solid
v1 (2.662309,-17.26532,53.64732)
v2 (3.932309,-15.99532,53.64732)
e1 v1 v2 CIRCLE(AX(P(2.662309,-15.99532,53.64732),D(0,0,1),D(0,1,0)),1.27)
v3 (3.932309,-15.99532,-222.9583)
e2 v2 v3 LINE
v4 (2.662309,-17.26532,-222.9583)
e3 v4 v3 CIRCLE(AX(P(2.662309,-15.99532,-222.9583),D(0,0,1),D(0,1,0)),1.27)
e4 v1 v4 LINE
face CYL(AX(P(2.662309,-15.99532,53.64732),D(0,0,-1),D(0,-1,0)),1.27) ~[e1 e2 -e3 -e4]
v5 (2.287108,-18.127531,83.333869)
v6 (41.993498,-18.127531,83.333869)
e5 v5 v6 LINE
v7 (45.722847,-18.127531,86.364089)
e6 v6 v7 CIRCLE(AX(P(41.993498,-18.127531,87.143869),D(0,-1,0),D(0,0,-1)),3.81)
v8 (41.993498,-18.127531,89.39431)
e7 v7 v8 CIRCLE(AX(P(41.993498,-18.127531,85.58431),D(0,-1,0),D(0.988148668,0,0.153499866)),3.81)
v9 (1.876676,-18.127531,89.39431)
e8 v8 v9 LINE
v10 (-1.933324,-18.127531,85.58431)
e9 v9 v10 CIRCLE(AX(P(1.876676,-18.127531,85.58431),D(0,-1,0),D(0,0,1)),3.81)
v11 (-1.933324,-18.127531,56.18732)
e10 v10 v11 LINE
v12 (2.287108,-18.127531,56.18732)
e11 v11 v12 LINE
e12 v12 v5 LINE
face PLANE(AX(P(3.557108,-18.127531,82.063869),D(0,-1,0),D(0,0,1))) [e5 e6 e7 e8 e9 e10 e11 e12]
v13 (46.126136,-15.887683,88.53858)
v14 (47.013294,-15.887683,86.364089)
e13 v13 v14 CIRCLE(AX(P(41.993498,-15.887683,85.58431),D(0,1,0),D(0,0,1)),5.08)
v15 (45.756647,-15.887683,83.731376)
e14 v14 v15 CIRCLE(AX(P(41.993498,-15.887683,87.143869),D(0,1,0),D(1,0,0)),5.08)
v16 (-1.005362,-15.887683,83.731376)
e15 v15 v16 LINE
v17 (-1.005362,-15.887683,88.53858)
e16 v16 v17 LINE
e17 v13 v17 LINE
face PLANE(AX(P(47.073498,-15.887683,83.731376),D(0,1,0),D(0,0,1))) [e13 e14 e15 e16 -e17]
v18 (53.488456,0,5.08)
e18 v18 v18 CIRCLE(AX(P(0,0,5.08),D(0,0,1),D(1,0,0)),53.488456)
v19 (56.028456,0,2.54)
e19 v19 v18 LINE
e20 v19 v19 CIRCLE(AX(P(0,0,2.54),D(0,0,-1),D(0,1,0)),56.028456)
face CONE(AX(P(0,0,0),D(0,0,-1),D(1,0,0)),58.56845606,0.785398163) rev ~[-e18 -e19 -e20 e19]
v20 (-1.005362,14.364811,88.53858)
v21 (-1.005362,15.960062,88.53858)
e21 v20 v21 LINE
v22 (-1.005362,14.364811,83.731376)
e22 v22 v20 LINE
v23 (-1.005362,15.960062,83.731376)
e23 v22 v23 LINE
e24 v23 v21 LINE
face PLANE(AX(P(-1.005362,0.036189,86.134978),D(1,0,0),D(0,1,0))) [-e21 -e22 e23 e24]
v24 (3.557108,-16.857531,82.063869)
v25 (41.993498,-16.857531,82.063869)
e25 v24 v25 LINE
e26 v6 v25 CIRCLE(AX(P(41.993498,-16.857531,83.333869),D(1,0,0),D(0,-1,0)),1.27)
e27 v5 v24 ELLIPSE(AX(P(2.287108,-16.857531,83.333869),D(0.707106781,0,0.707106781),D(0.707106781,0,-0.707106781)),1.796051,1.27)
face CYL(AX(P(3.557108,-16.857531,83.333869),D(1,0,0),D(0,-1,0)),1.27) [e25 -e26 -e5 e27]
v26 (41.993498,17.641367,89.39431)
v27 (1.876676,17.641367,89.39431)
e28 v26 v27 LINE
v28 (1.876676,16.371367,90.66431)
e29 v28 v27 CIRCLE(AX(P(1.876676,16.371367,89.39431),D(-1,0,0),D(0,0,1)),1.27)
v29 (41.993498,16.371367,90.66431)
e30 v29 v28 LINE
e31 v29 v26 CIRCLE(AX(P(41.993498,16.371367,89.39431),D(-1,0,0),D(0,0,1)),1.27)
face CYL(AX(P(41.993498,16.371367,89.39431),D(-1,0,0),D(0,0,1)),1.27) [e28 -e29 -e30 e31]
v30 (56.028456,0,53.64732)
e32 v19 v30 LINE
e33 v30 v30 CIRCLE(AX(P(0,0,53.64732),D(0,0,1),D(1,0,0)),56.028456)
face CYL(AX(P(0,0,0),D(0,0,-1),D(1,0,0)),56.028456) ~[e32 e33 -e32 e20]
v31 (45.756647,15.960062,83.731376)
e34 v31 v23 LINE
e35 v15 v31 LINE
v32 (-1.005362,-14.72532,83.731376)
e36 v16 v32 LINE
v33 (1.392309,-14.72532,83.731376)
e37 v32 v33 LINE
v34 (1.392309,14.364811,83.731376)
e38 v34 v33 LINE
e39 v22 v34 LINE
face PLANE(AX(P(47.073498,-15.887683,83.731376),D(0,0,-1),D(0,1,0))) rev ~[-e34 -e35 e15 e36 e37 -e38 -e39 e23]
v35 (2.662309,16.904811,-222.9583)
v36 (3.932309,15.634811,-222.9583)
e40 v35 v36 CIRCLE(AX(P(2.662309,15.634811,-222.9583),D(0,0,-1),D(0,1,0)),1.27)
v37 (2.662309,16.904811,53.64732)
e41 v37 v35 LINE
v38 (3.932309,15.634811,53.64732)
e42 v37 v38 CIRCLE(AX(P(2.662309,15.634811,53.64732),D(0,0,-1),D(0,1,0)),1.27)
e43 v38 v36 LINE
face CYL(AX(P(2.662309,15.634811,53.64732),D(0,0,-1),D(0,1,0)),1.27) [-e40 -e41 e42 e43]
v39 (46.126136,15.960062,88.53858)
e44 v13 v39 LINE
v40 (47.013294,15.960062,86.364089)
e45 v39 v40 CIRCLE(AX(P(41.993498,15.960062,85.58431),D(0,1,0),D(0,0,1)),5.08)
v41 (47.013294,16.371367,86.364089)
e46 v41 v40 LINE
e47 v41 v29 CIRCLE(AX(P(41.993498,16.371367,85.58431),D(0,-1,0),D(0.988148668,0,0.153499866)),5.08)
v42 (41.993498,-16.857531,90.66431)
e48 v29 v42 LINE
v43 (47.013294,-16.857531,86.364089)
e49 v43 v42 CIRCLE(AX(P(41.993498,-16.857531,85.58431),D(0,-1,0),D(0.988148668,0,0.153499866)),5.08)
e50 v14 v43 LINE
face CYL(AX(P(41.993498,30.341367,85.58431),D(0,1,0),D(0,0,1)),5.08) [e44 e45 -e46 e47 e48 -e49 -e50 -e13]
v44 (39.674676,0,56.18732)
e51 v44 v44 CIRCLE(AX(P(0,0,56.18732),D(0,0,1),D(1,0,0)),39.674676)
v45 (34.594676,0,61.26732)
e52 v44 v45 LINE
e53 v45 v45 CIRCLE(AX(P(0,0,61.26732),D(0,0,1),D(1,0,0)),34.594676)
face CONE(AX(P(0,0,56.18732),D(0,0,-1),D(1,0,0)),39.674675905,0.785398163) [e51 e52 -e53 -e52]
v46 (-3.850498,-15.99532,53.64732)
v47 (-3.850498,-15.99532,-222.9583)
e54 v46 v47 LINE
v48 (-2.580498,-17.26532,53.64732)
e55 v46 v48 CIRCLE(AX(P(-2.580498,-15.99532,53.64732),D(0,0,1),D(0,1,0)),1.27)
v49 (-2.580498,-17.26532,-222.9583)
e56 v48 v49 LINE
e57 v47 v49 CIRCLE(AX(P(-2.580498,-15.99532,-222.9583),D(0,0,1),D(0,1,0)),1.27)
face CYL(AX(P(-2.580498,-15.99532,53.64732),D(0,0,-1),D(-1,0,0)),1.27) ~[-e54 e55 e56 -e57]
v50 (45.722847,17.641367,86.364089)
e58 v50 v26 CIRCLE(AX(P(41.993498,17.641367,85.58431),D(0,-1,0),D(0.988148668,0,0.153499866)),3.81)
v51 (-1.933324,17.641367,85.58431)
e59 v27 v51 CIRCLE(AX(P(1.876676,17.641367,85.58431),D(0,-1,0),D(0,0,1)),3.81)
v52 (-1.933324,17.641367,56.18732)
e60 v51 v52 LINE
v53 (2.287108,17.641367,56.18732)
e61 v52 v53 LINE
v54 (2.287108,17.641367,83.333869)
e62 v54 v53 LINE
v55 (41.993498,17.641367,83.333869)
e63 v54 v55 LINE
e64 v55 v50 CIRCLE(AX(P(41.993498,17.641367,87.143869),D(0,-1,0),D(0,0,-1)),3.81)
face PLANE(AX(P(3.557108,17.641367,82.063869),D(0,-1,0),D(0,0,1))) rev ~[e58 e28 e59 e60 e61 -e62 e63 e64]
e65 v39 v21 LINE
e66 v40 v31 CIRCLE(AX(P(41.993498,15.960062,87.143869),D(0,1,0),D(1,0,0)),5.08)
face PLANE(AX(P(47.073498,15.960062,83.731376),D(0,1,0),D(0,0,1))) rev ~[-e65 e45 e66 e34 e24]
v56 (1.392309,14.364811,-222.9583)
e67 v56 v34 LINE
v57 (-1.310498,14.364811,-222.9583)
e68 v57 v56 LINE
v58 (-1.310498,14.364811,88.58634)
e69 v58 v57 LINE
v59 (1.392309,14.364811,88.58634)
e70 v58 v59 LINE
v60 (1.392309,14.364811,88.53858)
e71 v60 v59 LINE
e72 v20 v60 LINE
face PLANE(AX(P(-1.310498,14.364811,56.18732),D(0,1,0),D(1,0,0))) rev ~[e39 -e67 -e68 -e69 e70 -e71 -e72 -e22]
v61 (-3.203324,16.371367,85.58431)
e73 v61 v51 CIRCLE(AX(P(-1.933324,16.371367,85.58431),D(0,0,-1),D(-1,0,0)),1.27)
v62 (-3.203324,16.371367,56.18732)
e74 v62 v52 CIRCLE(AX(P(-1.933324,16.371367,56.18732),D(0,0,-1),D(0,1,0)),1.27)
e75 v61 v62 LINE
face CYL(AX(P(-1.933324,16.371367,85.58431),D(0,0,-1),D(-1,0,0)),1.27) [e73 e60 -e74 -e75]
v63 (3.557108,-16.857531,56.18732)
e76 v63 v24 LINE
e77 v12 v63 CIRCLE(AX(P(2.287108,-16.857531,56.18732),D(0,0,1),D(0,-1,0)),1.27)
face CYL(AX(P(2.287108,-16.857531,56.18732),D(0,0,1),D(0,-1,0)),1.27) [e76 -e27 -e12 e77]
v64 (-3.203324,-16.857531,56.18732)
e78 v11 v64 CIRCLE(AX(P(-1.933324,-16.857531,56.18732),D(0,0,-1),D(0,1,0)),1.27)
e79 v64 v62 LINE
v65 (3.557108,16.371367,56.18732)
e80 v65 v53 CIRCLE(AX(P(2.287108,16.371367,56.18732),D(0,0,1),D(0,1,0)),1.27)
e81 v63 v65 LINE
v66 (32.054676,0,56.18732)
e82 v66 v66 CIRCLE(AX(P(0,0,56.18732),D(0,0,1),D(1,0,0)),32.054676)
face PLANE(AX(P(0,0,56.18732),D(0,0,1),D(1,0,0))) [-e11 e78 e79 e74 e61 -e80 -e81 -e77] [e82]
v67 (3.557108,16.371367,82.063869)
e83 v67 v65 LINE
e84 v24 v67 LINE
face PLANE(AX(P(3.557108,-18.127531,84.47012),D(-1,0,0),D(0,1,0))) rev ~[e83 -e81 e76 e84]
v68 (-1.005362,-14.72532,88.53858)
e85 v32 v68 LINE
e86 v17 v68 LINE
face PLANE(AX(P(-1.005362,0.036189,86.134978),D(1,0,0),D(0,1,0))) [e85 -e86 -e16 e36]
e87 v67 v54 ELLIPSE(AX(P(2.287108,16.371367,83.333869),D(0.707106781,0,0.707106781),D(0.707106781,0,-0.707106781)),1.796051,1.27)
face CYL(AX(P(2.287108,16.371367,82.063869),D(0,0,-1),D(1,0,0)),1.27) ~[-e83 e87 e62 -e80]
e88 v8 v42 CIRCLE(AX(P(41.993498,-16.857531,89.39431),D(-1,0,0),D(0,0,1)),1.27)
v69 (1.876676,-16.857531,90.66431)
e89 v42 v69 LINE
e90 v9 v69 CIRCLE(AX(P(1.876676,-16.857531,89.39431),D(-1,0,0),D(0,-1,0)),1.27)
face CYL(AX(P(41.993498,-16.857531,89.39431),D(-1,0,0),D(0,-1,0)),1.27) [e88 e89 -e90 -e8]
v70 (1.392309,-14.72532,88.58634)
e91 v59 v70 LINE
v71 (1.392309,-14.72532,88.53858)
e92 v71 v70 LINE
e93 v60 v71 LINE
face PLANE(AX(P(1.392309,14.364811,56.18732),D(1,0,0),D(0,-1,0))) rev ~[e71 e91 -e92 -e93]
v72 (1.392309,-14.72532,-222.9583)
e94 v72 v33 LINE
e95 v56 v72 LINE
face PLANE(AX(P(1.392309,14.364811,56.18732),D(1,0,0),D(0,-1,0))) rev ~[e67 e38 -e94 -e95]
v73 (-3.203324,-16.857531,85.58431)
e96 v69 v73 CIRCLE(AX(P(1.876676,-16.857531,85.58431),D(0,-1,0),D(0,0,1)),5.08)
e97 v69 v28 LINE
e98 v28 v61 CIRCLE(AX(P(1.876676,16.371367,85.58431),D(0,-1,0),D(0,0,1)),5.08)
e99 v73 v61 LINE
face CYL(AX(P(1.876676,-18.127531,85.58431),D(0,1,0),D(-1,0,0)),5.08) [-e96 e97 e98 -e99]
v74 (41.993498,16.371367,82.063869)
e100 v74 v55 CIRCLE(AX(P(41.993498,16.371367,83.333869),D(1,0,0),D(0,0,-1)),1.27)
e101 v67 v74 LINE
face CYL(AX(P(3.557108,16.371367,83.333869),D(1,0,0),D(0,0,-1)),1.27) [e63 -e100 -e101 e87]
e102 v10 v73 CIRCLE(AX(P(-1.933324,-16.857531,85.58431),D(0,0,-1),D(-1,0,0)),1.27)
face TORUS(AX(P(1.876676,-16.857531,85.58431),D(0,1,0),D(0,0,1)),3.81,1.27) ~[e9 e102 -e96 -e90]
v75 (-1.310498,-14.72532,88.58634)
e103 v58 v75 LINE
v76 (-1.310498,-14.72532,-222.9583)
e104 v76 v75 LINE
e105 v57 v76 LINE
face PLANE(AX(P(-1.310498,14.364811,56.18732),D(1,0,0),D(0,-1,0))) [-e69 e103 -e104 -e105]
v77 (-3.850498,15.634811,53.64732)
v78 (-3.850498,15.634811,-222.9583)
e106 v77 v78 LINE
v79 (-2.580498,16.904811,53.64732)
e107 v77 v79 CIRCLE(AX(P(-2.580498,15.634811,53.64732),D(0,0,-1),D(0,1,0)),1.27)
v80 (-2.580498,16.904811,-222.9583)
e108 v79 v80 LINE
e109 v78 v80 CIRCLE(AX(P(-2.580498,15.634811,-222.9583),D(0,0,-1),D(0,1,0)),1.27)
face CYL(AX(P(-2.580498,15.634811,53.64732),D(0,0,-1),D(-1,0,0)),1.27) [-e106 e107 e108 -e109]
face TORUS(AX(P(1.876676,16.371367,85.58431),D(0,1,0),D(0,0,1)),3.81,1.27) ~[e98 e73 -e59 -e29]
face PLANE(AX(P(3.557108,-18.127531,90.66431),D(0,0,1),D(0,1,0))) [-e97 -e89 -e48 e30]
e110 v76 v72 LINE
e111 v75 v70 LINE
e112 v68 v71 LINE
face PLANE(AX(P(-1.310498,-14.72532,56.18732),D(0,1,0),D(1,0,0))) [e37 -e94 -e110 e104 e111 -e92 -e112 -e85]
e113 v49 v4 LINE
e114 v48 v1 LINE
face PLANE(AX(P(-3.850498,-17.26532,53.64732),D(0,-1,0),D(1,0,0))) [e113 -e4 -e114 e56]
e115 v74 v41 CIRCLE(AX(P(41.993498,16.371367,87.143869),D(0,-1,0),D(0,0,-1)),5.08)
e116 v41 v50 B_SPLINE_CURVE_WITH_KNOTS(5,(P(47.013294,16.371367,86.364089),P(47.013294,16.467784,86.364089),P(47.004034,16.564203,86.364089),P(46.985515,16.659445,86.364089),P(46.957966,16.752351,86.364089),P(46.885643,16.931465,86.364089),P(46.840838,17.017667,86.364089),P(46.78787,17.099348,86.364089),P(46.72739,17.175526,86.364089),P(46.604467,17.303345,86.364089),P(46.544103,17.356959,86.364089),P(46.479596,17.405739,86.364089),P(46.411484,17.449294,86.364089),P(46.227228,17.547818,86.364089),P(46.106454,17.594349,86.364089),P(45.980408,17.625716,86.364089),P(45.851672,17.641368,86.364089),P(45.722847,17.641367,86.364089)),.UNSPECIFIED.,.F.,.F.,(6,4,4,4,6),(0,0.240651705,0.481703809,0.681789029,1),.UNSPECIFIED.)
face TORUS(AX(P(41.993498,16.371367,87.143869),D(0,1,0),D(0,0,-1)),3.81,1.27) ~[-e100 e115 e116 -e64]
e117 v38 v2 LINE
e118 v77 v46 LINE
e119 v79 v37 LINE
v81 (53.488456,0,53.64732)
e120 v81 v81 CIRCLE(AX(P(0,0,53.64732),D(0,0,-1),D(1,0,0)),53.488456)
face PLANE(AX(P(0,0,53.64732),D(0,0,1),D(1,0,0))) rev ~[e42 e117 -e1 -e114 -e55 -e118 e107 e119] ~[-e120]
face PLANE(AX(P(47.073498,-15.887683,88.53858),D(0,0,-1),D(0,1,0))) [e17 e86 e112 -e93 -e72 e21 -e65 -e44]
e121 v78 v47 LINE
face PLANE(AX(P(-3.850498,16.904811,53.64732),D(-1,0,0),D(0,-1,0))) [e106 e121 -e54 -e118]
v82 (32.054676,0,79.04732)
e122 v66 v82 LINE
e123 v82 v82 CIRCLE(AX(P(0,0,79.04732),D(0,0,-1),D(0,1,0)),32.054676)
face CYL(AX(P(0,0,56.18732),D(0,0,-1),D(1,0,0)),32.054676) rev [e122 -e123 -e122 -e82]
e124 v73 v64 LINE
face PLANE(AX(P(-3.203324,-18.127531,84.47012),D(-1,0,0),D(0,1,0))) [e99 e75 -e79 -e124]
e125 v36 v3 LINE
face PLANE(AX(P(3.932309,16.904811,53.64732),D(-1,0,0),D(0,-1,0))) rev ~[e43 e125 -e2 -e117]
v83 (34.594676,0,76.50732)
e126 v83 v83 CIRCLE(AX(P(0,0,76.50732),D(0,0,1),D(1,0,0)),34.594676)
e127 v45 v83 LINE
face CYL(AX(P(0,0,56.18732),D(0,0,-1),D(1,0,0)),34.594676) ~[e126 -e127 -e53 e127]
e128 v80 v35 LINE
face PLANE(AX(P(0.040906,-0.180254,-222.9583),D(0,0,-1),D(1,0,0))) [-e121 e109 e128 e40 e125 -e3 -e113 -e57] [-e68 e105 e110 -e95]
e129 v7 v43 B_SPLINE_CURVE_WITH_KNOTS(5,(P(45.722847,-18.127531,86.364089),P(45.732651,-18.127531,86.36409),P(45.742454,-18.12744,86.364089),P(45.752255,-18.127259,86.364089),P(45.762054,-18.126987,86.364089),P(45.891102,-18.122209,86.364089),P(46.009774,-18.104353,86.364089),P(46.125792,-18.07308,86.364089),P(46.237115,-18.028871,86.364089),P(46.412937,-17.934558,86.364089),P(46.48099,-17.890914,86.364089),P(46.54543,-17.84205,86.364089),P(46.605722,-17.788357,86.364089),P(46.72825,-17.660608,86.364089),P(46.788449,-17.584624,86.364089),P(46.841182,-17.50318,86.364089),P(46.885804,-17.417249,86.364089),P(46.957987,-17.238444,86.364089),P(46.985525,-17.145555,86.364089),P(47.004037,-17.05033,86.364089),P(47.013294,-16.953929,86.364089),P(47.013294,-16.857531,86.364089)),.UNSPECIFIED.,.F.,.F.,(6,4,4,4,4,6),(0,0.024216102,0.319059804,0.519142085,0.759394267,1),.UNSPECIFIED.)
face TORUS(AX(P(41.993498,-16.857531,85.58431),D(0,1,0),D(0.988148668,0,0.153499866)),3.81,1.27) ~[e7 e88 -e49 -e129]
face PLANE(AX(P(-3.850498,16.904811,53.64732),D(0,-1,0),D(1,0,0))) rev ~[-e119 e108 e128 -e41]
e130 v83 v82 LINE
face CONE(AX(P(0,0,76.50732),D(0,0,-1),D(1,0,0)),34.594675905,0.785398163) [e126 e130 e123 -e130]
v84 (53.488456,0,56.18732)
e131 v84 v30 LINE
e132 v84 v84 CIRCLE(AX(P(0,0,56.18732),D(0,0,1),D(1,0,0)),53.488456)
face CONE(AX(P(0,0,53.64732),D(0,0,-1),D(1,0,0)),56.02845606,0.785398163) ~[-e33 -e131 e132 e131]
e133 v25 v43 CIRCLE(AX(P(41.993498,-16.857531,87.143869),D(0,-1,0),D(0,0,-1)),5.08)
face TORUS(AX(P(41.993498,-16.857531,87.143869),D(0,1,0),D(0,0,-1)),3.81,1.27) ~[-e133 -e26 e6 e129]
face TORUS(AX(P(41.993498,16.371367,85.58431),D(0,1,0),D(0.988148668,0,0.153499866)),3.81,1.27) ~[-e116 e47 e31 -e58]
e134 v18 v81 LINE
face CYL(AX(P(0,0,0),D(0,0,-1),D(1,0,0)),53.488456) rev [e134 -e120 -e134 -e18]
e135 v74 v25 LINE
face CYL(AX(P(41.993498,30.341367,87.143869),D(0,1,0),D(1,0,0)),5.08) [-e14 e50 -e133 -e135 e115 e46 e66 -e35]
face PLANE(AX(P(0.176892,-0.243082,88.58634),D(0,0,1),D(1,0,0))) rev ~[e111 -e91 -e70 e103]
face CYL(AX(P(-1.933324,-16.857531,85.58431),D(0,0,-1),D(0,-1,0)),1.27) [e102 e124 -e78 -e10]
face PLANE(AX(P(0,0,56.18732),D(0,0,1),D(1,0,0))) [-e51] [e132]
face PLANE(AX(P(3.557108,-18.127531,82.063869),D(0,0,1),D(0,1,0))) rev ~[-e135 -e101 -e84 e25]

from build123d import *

# Parameters (mm, degrees)
F0_R         = 56.0284560605
F1_DEPTH     = 56.18732
F2_T         = -2.54
F3_W         = 7.7828075737
F3_H         = 34.1701302677
F4_DEPTH     = 276.60562
F6_R         = 34.5946759053
F7_DEPTH     = 25.4
F8_T         = 2.54
F8_T3_DEPTH  = 39.2501302677
F8_T5_DEPTH  = 12.8628075737
F10_SIZE     = 2.54
F11_W        = 6.7604319192
F11_H        = 35.768898204
F12_DEPTH    = 28.2828
F13_W        = 6.7604319192
F13_H        = 35.768898204
F14_DEPTH    = 6.19419
F15_W        = 35.768898204
F15_H        = 8.6004413581
F16_DEPTH    = 43.51639
F17_W        = 31.8477451801
F17_H        = 4.8072040081
F18_DEPTH    = 48.07886
F19_DEPTH    = 32.39902
F20_R        = 5.08
F21_T1_DEPTH = 61.168898204
F22_R        = 1.27


# Not quite as in the source:
# - a fillet or chamfer that OpenCascade refuses, or shapes differently, is made with other operations: its cross-section is extruded or revolved along the edge and cut away or added
# - a shell that OpenCascade refuses in one call is made with other operations: the cavity is built on its own and cut out


with BuildPart() as f1:
    # F0 (on Top) → F1 (new body)
    with BuildSketch(Plane.XY):
        Circle(F0_R)
    extrude(amount=F1_DEPTH)

    # F2
    f2_openings = [f1.faces().sort_by_distance(p)[0] for p in [
        (0, 0, 0),
    ]]
    offset(amount=F2_T, openings=f2_openings)

    # F3 (on face) → F4 (join)
    with BuildSketch(Plane(origin=(0, 0, 53.64732), x_dir=(1, 0, 0), z_dir=(0, 0, -1))):
        with Locations((0.0409056073, 0.1802544365)):
            Rectangle(F3_W, F3_H)
    extrude(amount=F4_DEPTH)

    # F5: chamfer of 5.08 on 1 edges, made by hand

    # F5_s1 → F5_t2 (revolve, cut)
    with BuildSketch(Plane.XZ):
        Polygon((58.5684560605, 0), (53.4884560605, 5.08), (53.4884560605, 0), align=None)
    revolve(axis=Axis((0, 0, 0), (0, 0, 1)), mode=Mode.SUBTRACT)

    # F6 (on face) → F7 (join)
    with BuildSketch(Plane.XY.offset(56.18732)):
        Circle(F6_R)
    extrude(amount=F7_DEPTH)

    # F8: shell of thickness 2.54, made by hand


with BuildPart() as f8_core1:
    # F8_t2: copy of F1
    add(f1.part)

    # the walls: a layer under each face that stays
    f8_faces = [f8_core1.faces().sort_by_distance(p)[0] for p in [
        (-56.0284560605, 0, 29.36366),
        (-54.7584560605, 0, 3.81),
        (-37.3523040403, -37.3523040403, 56.18732),
        (-53.4884560605, 0, 29.36366),
        (-34.5946759053, 0, 68.88732),
        (-35.658970707, -35.658970707, 53.64732),
        (3.9323093942, -0.1802544365, -84.65549),
        (0.0409056073, 16.9048106974, -84.65549),
        (-3.8504981795, -0.1802544365, -84.65549),
        (0.0409056073, -17.2653195703, -84.65549),
    ]]
    thicken(f8_faces, amount=-F8_T, mode=Mode.SUBTRACT)

    # F8_s4 → F8_t3 (cut)
    with BuildSketch(Plane.XZ.offset(-19.4448106974)):
        Polygon((3.9577093942, 53.62192), (3.9323093942, 56.18732), (1.3923093942, 56.18732), (1.3923093942, 53.64732), align=None)
        Polygon((-3.8758981795, 53.62192), (-3.8504981795, 56.18732), (-1.3104981795, 56.18732), (-1.3104981795, 53.64732), align=None)
    extrude(amount=F8_T3_DEPTH, mode=Mode.SUBTRACT)

    # F8_s6 → F8_t5 (cut)
    with BuildSketch(Plane.YZ.offset(-6.3904981795)):
        Polygon((16.9302106974, 53.62192), (16.9048106974, 56.18732), (14.3648106974, 56.18732), (14.3648106974, 53.64732), align=None)
        Polygon((-17.2907195703, 53.62192), (-17.2653195703, 56.18732), (-14.7253195703, 56.18732), (-14.7253195703, 53.64732), align=None)
    extrude(amount=F8_T5_DEPTH, mode=Mode.SUBTRACT)

    # F8_s7 → F8_t8 (revolve, cut)
    with BuildSketch(Plane.XZ):
        Polygon((34.6200759053, 56.21272), (34.5946759053, 53.64732), (32.0546759053, 53.64732), (32.0546759053, 56.18732), align=None)
    revolve(axis=Axis((0, 0, 56.18732), (0, 0, 1)), mode=Mode.SUBTRACT)

    # F8_s9 → F8_t10 (revolve, cut)
    with BuildSketch(Plane.XZ):
        Polygon((53.4630560605, 53.62192), (56.0284560605, 53.64732), (56.0284560605, 56.18732), (53.4884560605, 56.18732), align=None)
    revolve(axis=Axis((0, 0, 53.64732), (0, 0, -1)), mode=Mode.SUBTRACT)


with BuildPart() as f1_1:
    add(f1.part)

    # what is left inside the walls is the cavity
    f8_cavity = [f8_core1.part.solids().sort_by_distance(p)[0] for p in [
        (1.366909, -5.028609, -83.38549),
    ]]
    add(f8_cavity, mode=Mode.SUBTRACT)

    # F9: chamfer of 5.08 on 2 edges, made by hand

    # F9_s1 → F9_t2 (revolve)
    with BuildSketch(Plane.XZ):
        Polygon((39.6746759053, 56.18732), (34.5946759053, 61.26732), (34.5946759053, 56.18732), align=None)
    revolve(axis=Axis((0, 0, 56.18732), (0, 0, 1)))

    # F9_s3 → F9_t4 (revolve, cut)
    with BuildSketch(Plane.XZ):
        Polygon((34.5946759053, 76.50732), (29.5146759053, 81.58732), (34.5946759053, 81.58732), align=None)
    revolve(axis=Axis((0, 0, 81.58732), (0, 0, 1)), mode=Mode.SUBTRACT)

    # F10
    f10_edges = [f1_1.edges().sort_by_distance(p)[0] for p in [
        (-56.028456, 0, 56.18732),
    ]]
    chamfer(f10_edges, length=F10_SIZE)

    # F11 (on face) → F12 (join)
    with BuildSketch(Plane.XY.offset(56.18732)):
        with Locations((0.176892383, -0.2430817112)):
            Rectangle(F11_W, F11_H)
    extrude(amount=F12_DEPTH)

    # F13 (on face) → F14 (join)
    with BuildSketch(Plane.XY.offset(84.47012)):
        with Locations((0.176892383, -0.2430817112)):
            Rectangle(F13_W, F13_H)
    extrude(amount=F14_DEPTH)

    # F15 (on face) → F16 (join)
    with BuildSketch(Plane.YZ.offset(3.5571083426)):
        with Locations((-0.2430817112, 86.3640893209)):
            Rectangle(F15_W, F15_H)
    extrude(amount=F16_DEPTH)

    # F17 (on face) → F18 (cut)
    with BuildSketch(Plane.YZ.offset(47.0734983426)):
        with Locations((0.0361893326, 86.1349776387)):
            Rectangle(F17_W, F17_H)
    extrude(amount=-F18_DEPTH, mode=Mode.SUBTRACT)

    # F19 (cut): a face of the model
    f19_faces = [f1_1.faces().sort_by_distance(p)[0] for p in [
        (0.0409056074, -0.1802544364, 56.18732),
    ]]
    extrude(f19_faces, amount=-F19_DEPTH, mode=Mode.SUBTRACT)

    # F20
    f20_edges = [f1_1.edges().sort_by_distance(p)[0] for p in [
        (-3.203324, -0.243082, 90.66431),
    ]]
    fillet(f20_edges, radius=F20_R)

    # F21: fillet of radius 5.08 on 2 edges, made by hand

    # F21_s2 → F21_t1 (cut)
    with BuildSketch(Plane.XZ.offset(-30.3413673908)):
        with BuildLine():
            ThreePointArc((41.9934983426, 90.66431), (45.5856007911, 89.1764124484), (47.0734983426, 85.58431))
            Line((47.0734983426, 85.58431), (47.0734983426, 90.66431))
            Line((47.0734983426, 90.66431), (41.9934983426, 90.66431))
        make_face()
        with BuildLine():
            ThreePointArc((47.0734983426, 87.1438686419), (45.5856007911, 83.5517661934), (41.9934983426, 82.0638686419))
            Line((41.9934983426, 82.0638686419), (47.0734983426, 82.0638686419))
            Line((47.0734983426, 82.0638686419), (47.0734983426, 87.1438686419))
        make_face()
    extrude(amount=F21_T1_DEPTH, mode=Mode.SUBTRACT)

    # F22
    f22_edges = [f1_1.edges().sort_by_distance(p)[0] for p in [
        (21.935087, -18.127531, 90.66431),
        (21.935087, 17.641367, 90.66431),
        (22.775303, -18.127531, 82.063869),
        (22.775303, 17.641367, 82.063869),
        (3.557108, -18.127531, 69.125594),
        (3.557108, 17.641367, 69.125594),
        (3.932309, 16.904811, -84.65549),
        (3.932309, -17.26532, -84.65549),
        (-3.850498, 16.904811, -84.65549),
        (-3.850498, -17.26532, -84.65549),
    ]]
    fillet(f22_edges, radius=F22_R)


solid = f1_1.part
